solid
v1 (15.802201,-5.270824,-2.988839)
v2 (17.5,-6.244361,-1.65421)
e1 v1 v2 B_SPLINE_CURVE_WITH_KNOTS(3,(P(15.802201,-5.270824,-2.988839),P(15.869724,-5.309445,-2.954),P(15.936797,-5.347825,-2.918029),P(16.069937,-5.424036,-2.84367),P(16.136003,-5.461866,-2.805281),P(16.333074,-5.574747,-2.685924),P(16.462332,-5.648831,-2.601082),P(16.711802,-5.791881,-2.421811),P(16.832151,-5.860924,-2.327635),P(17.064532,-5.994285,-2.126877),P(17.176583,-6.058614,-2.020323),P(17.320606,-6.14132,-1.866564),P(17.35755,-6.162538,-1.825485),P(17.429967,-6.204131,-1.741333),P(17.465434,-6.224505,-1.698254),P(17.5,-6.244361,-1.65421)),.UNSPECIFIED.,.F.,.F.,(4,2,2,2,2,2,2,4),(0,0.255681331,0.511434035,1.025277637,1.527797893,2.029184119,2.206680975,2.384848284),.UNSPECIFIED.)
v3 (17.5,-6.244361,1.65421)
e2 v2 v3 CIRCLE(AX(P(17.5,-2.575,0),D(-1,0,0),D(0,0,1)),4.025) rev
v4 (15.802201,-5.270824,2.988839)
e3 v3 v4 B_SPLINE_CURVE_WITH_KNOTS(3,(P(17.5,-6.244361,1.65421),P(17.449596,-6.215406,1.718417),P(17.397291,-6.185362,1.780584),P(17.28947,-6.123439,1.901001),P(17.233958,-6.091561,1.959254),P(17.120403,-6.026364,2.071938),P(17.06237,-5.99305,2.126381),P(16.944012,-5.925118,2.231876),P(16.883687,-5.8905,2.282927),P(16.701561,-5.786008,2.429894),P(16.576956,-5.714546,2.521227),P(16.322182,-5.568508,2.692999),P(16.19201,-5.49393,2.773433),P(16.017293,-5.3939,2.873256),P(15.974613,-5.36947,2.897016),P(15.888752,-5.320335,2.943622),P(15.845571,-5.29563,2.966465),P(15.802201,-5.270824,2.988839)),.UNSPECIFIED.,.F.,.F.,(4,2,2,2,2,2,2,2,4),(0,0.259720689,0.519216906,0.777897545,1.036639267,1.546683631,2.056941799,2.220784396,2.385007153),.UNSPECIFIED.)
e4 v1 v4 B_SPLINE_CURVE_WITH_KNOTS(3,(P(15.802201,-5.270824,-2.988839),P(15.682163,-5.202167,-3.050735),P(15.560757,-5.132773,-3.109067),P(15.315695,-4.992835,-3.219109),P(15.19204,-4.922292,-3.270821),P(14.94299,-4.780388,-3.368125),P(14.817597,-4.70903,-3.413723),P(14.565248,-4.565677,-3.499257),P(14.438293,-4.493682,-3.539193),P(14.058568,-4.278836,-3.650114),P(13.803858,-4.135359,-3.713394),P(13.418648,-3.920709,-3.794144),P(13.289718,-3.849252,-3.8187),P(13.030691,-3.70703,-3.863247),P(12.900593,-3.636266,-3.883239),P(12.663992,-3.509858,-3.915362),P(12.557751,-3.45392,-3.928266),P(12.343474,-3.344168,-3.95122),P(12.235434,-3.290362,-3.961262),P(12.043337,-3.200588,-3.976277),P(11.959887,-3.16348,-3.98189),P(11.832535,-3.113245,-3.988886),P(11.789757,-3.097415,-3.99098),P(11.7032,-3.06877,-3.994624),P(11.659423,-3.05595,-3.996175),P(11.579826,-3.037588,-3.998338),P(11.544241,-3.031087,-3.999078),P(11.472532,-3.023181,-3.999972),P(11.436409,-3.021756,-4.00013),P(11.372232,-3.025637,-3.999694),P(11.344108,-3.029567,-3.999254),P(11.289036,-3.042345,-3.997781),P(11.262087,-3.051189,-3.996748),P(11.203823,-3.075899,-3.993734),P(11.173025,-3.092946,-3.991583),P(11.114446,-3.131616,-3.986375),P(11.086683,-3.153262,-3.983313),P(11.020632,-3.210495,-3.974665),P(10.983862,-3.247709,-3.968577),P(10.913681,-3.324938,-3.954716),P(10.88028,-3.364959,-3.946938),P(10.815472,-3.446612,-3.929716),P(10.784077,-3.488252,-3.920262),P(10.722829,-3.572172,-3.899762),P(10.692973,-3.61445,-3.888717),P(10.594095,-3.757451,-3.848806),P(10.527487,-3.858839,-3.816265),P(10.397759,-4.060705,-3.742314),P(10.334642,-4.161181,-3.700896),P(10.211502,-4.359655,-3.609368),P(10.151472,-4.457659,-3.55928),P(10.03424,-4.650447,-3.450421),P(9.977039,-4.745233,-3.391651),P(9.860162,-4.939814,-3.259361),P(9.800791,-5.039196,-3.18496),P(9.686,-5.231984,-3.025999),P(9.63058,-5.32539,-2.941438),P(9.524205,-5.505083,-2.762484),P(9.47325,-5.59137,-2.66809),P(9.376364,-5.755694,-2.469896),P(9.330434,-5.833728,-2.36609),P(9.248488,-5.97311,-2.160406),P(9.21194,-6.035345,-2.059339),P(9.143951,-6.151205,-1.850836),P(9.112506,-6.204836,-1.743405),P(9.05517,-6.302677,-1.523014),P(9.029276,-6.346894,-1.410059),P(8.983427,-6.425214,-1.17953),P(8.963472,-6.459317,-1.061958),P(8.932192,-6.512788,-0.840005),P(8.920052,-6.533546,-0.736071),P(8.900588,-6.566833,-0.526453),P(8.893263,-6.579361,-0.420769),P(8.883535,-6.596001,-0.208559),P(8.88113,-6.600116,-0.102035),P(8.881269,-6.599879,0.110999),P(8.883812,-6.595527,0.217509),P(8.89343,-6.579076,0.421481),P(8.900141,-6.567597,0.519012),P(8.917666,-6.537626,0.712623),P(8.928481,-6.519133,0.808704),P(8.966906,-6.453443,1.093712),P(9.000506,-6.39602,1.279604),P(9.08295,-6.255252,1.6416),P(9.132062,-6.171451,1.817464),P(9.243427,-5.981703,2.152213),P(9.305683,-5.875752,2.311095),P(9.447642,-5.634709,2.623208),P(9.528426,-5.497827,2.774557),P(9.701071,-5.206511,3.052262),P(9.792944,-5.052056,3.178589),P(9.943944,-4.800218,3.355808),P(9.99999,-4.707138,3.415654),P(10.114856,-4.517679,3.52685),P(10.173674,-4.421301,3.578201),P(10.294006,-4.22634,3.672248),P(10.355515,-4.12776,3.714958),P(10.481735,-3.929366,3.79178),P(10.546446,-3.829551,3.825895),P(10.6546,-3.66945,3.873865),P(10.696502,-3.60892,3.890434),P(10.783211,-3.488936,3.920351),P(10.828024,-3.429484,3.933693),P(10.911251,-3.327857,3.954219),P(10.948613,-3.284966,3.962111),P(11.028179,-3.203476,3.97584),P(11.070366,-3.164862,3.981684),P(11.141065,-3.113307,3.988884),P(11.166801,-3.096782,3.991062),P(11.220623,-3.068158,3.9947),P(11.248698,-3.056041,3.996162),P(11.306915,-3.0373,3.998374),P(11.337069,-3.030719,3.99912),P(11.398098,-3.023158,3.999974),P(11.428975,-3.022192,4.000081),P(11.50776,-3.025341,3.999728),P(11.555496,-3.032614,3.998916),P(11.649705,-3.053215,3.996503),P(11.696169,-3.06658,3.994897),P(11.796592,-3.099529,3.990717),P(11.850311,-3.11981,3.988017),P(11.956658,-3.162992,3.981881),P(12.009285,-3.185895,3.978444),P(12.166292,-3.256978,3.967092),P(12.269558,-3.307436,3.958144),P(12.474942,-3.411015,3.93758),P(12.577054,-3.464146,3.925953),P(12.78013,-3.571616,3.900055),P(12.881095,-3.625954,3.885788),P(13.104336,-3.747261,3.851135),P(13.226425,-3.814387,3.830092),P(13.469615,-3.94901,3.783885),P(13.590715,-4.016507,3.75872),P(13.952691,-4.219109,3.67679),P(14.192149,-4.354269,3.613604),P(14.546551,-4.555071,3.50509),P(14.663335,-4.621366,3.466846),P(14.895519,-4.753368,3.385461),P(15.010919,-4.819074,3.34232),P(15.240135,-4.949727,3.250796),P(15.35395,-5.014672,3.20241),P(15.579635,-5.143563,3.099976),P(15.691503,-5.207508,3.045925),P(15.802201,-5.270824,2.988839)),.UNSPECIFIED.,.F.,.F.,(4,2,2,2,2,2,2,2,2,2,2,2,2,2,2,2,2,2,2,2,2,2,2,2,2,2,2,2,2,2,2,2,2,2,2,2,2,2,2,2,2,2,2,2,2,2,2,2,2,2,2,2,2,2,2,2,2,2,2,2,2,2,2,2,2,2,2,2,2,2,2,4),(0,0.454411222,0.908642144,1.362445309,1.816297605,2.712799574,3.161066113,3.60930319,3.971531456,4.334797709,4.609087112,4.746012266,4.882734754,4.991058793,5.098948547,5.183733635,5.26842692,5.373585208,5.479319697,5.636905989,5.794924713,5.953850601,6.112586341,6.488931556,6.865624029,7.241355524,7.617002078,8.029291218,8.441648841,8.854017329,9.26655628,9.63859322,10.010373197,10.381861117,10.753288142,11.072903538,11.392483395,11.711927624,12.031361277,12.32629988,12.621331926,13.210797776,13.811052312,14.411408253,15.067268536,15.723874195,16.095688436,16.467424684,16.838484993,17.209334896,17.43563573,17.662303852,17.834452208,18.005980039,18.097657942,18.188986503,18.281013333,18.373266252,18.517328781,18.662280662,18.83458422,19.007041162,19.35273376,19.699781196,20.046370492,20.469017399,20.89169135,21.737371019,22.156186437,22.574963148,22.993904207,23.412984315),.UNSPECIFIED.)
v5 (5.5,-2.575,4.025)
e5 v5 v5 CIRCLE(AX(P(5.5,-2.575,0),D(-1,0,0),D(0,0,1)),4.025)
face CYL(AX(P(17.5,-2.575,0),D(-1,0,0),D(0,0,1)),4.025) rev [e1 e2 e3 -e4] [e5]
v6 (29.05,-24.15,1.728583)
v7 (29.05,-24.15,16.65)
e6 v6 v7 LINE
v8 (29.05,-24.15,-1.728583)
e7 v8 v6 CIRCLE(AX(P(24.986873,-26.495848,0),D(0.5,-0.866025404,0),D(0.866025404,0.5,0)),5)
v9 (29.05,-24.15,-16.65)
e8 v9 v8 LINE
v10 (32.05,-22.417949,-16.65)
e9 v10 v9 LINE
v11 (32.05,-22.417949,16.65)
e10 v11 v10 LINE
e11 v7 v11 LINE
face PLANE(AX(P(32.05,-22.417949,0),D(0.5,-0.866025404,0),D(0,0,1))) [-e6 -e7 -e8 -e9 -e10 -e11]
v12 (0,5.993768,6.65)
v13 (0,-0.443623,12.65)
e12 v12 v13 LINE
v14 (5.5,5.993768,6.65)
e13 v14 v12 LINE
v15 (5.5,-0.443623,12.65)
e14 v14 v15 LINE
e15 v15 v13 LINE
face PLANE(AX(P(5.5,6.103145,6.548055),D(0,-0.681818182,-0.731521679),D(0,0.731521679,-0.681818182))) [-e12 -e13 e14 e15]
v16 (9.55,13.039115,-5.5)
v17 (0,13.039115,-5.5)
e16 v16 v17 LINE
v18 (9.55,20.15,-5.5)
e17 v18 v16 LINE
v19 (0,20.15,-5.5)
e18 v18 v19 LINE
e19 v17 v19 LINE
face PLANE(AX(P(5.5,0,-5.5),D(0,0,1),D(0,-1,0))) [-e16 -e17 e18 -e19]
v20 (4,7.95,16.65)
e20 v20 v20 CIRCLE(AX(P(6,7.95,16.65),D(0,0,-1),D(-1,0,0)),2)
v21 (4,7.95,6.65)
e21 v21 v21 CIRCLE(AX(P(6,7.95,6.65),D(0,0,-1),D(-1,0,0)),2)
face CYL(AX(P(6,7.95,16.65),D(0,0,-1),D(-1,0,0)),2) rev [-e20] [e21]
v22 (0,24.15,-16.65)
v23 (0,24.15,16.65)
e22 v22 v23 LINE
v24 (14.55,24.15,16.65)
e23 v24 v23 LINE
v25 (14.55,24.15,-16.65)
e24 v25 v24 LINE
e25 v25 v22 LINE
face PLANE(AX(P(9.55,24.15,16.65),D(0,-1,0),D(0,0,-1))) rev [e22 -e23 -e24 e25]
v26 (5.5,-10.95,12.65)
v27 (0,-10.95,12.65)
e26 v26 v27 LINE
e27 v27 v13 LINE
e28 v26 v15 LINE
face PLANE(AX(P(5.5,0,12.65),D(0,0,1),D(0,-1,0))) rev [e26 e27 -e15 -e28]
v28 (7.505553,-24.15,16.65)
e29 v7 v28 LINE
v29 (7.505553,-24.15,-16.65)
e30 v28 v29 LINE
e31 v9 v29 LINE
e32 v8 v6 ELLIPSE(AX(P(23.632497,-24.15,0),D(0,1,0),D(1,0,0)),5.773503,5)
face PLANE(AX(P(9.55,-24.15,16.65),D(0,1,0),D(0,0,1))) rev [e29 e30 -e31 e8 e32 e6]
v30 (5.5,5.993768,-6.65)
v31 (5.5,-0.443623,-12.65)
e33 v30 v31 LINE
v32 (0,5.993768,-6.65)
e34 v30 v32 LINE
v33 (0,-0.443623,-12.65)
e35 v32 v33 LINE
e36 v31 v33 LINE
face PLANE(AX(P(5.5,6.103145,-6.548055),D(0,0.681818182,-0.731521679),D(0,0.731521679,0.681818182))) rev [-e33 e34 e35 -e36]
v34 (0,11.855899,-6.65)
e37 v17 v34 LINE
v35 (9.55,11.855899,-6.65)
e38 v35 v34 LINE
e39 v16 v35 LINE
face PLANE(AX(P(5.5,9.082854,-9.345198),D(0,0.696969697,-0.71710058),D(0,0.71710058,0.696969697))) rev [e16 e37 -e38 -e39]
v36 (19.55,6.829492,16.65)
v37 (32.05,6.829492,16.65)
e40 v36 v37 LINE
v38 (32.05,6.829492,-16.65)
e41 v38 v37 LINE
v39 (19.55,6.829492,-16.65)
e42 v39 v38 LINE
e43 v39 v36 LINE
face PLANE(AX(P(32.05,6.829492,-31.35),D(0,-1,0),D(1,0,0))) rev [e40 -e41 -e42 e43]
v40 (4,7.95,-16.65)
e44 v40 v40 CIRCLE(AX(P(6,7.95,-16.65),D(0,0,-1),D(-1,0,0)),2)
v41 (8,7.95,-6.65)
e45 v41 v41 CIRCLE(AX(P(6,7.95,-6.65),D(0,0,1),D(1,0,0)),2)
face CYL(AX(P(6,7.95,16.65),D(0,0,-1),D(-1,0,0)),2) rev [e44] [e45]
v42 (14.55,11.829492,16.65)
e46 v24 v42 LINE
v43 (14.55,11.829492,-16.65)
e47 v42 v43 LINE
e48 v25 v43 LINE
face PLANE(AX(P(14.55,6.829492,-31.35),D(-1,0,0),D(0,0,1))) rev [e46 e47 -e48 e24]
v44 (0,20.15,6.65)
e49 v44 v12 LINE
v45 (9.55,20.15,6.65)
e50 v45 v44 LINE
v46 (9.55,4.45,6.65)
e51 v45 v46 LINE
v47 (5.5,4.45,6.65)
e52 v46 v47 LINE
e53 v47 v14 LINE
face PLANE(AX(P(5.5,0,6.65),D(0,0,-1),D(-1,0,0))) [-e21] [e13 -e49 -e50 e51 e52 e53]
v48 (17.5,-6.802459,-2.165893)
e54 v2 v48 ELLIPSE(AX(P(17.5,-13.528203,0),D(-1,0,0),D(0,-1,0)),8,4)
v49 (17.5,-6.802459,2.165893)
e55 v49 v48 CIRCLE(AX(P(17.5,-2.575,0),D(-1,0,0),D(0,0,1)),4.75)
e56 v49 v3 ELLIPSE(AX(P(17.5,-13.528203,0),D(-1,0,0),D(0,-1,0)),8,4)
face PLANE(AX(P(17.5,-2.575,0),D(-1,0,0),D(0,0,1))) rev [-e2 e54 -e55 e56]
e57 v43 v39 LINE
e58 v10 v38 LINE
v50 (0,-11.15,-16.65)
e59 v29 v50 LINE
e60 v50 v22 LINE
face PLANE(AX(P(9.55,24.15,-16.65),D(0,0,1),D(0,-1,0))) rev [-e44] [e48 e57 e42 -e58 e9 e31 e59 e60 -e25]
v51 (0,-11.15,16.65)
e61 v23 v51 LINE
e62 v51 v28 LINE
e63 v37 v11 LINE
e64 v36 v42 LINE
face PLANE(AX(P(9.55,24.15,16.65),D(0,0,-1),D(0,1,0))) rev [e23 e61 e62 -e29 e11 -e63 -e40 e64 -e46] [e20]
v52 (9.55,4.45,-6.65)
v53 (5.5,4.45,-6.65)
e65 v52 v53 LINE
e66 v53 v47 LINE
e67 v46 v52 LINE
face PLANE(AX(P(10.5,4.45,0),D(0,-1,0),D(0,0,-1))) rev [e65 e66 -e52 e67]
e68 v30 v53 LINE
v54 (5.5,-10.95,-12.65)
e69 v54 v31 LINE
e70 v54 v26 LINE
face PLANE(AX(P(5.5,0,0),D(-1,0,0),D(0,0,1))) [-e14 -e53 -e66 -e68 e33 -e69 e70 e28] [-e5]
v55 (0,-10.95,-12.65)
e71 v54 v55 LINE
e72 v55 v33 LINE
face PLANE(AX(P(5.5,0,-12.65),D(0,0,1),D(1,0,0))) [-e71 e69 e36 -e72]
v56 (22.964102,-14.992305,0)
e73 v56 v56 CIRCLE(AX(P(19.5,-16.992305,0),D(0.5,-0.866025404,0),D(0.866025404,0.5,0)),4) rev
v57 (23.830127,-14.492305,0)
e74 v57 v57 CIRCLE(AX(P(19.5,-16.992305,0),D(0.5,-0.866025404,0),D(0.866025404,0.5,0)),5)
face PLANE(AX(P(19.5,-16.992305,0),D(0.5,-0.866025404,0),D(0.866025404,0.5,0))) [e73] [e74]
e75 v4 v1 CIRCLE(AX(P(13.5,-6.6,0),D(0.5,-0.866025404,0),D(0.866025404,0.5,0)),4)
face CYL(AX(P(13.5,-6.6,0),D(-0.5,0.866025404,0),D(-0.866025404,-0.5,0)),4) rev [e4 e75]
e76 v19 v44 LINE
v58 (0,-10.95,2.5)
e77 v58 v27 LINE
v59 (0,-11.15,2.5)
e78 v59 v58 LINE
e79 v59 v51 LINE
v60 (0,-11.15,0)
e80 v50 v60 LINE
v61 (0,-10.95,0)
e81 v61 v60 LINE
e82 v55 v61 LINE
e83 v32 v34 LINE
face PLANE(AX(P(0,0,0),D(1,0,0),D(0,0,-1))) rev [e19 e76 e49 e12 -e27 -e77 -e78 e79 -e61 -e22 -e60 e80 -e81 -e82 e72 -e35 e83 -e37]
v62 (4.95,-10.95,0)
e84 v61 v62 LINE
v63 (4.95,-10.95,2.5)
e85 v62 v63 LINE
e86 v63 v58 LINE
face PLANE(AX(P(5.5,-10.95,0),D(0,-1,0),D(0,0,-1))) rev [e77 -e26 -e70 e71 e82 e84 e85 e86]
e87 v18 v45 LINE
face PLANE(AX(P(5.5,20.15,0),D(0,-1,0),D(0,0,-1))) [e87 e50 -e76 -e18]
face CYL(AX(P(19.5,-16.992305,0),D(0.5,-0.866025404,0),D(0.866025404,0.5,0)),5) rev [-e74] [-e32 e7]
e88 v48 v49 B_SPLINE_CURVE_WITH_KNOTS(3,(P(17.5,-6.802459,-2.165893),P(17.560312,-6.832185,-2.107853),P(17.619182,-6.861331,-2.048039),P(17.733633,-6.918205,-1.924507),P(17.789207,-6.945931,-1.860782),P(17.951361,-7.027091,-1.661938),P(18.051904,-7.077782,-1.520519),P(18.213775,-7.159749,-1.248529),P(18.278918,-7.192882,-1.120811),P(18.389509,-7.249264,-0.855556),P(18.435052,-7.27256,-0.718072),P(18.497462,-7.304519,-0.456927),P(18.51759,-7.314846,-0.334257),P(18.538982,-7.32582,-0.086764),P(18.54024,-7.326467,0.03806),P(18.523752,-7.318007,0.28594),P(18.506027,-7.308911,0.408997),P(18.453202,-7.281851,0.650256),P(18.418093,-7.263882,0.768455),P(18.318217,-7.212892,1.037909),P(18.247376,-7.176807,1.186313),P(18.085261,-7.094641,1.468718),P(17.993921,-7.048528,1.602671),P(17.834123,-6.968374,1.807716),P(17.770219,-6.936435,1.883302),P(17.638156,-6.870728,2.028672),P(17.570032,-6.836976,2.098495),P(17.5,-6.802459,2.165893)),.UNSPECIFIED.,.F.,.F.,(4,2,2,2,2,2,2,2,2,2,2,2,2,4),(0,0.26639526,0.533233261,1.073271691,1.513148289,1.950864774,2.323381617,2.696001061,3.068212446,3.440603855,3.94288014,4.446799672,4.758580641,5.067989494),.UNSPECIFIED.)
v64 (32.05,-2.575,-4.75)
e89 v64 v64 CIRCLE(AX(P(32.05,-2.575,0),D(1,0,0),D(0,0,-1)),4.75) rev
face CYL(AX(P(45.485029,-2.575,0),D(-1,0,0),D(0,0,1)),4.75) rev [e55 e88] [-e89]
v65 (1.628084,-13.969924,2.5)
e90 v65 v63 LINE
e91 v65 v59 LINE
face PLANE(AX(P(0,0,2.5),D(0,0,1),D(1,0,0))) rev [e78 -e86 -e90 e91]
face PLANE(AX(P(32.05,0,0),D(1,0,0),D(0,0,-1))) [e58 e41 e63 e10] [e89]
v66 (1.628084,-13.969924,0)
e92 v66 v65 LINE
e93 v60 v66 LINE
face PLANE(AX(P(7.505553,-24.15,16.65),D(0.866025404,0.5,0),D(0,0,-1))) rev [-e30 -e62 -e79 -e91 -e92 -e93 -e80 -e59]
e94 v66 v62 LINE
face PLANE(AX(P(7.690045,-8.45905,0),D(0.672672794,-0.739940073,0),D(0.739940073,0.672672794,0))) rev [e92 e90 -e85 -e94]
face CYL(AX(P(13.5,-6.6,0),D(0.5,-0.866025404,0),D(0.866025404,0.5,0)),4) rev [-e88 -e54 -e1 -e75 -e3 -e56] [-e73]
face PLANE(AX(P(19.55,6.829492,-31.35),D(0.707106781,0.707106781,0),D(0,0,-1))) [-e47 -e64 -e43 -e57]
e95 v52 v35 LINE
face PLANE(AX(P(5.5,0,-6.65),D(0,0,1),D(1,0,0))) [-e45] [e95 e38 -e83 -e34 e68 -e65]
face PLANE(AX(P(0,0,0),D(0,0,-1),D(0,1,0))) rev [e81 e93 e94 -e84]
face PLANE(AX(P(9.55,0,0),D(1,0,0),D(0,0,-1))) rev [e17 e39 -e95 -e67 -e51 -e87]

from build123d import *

# Parameters (mm, degrees)
SKETCH1_W               = 33.3
SKETCH1_H               = 48.3
BOSS_EXTRUDE1_DEPTH     = 9.55
CUT_EXTRUDE1_DEPTH      = 5.5
SKETCH3_W               = 5.65
SKETCH3_H               = 13.7
CUT_EXTRUDE2_DEPTH      = 5
SKETCH5_W               = 33.3
SKETCH5_H               = 48.3
BOSS_EXTRUDE3_DEPTH     = 22.5
SKETCH6_R               = 4.025
CUT_EXTRUDE3_DEPTH      = 12
SKETCH7_R               = 4.75
CUT_EXTRUDE4_DEPTH      = 14.55
CUT_EXTRUDE6_DEPTH      = 46.909857329
CUT_EXTRUDE6_DEPTH_BACK = 46.909857329
SKETCH27_R              = 2
SKETCH30_R              = 4
SKETCH31_R              = 5
CHAMFER1_SIZE           = 13
CHAMFER1_SIZE2          = 7.505553499
CHAMFER2_SIZE           = 10
CHAMFER2_SIZE2          = 17.320508076
CHAMFER3_SIZE           = 1.732050808
CHAMFER3_SIZE_2         = 3
CROQUIS2_W              = 17.5
CROQUIS2_H              = 17.320508076
CORTAR_EXTRUIR1_DEPTH   = 48
CHAMFER4_SIZE           = 5


with BuildPart() as part:
    # Sketch1 → Boss-Extrude1 (new body)
    with BuildSketch(Plane(origin=(0, 0, 0), x_dir=(0, 0, -1), z_dir=(1, 0, 0))):
        Rectangle(SKETCH1_W, SKETCH1_H)
    extrude(amount=BOSS_EXTRUDE1_DEPTH)

    # Sketch2 → Cut-Extrude1 (cut)
    # profile 1 of 2: a face of its own
    with BuildSketch(Plane.ZY):
        Polygon((-5.5, 13.039115125), (-5.5, 20.15), (4.5, 20.15), (6.65, 20.15), (6.65, 5.993768204), (12.65, -0.443622572), (12.65, -9.1), (12.65, -10.95), (-12.65, -10.95), (-12.65, -9.1), (-12.65, -0.443622572), (-6.65, 5.993768204), (-6.65, 11.855899168), align=None)
        Polygon((4.5, 19.15), (5.65, 19.15), (5.65, 5.6), (11.65, -0.837390776), (11.65, -9.1), (11.65, -9.95), (-11.65, -9.95), (-11.65, -9.1), (-11.65, -0.837390776), (-5.65, 5.6), (-5.65, 11.45), (-4.5, 12.633215957), (-4.5, 19.15), align=None, mode=Mode.SUBTRACT)
    # profile 2 of 2: a face of its own
    with BuildSketch(Plane.ZY):
        Polygon((5.65, 19.15), (5.65, 5.6), (11.65, -0.837390776), (11.65, -9.1), (11.65, -9.95), (-11.65, -9.95), (-11.65, -9.1), (-11.65, -0.837390776), (-5.65, 5.6), (-5.65, 11.45), (-4.5, 12.633215957), (-4.5, 19.15), (4.5, 19.15), align=None)
    extrude(amount=-CUT_EXTRUDE1_DEPTH, mode=Mode.SUBTRACT)

    # Sketch3 → Cut-Extrude2 (cut)
    # profile 1 of 3: a face of its own
    with BuildSketch(Plane.ZY.offset(-5.5)):
        Polygon((-6.65, 4.45), (6.65, 4.45), (6.65, 20.15), (-5.5, 20.15), (-5.5, 13.039115125), (-6.65, 11.855899168), align=None)
        Polygon((5.65, 5.45), (5.65, 19.15), (-4.5, 19.15), (-4.5, 12.633215957), (-5.65, 11.45), (-5.65, 5.45), align=None, mode=Mode.SUBTRACT)
    # profile 2 of 3: a face of its own
    with BuildSketch(Plane.ZY.offset(-5.5)):
        Polygon((0, 5.45), (0, 19.15), (-4.5, 19.15), (-4.5, 12.633215957), (-5.65, 11.45), (-5.65, 5.45), align=None)
    # profile 3 of 3: a face of its own
    with BuildSketch(Plane.ZY.offset(-5.5)):
        with Locations((2.825, 12.3)):
            Rectangle(SKETCH3_W, SKETCH3_H)
    extrude(amount=-CUT_EXTRUDE2_DEPTH, mode=Mode.SUBTRACT)

    # Sketch5 → Boss-Extrude3 (add)
    with BuildSketch(Plane(origin=(9.55, 0, 0), x_dir=(0, 0, -1), z_dir=(1, 0, 0))):
        Rectangle(SKETCH5_W, SKETCH5_H)
    extrude(amount=BOSS_EXTRUDE3_DEPTH)

    # Sketch6 → Cut-Extrude3 (cut)
    with BuildSketch(Plane.ZY.offset(-5.5)):
        with Locations((0, -2.575)):
            Circle(SKETCH6_R)
    extrude(amount=-CUT_EXTRUDE3_DEPTH, mode=Mode.SUBTRACT)

    # Sketch7 → Cut-Extrude4 (cut)
    with BuildSketch(Plane.ZY.offset(-17.5)):
        with Locations((0, -2.575)):
            Circle(SKETCH7_R)
    extrude(amount=-CUT_EXTRUDE4_DEPTH, mode=Mode.SUBTRACT)

    # Sketch27 → Cut-Extrude6 (cut, two sides: drawn at the far end of the back side and taken through both)
    with BuildSketch(Plane(origin=(0, 0, 5.65), x_dir=(-1, 0, 0), z_dir=(0, 0, -1)).offset(-CUT_EXTRUDE6_DEPTH_BACK)):
        with Locations((-6, 7.95)):
            Circle(SKETCH27_R)
    extrude(amount=CUT_EXTRUDE6_DEPTH + CUT_EXTRUDE6_DEPTH_BACK, mode=Mode.SUBTRACT)

    # Cut-Sweep1: sweep along a path in Sketch28
    with BuildLine(Plane.XY) as cut_sweep1_path:
        Line((25.736872918, -27.79488562), (13.5, -6.6))
        Line((13.5, -6.6), (11.25, -2.702885683))
    # Sketch30 → Cut-Sweep1 (sweep, cut)
    with BuildSketch(Plane(origin=(18.469756751, -31.990557096, 0), x_dir=(0, 0, -1), z_dir=(0.500000000000001, -0.866025403784438, 0))):
        with Locations((0, 8.391342951)):
            Circle(SKETCH30_R)
    sweep(path=cut_sweep1_path.line, mode=Mode.SUBTRACT)

    # Cut-Sweep2: sweep along a path in Sketch29
    with BuildLine(Plane.XY) as cut_sweep2_path:
        Line((19.5, -16.992304845), (25.736872918, -27.79488562))
    # Sketch31 → Cut-Sweep2 (sweep, cut)
    with BuildSketch(Plane(origin=(18.469756751, -31.990557096, 0), x_dir=(0, 0, -1), z_dir=(0.500000000000001, -0.866025403784438, 0))):
        with Locations((0, 8.391342951)):
            Circle(SKETCH31_R)
    sweep(path=cut_sweep2_path.line, mode=Mode.SUBTRACT)

    # Chamfer1
    chamfer1_edges = [part.edges().sort_by_distance(p)[0] for p in [
        (0, -24.15, 0),
    ]]
    chamfer1_side = [part.faces().sort_by_distance(p)[0] for p in [
        (0, 23.563333144, 0),
    ]]
    chamfer(chamfer1_edges, length=CHAMFER1_SIZE, length2=CHAMFER1_SIZE2, reference=chamfer1_side[0])

    # Chamfer2
    chamfer2_edges = [part.edges().sort_by_distance(p)[0] for p in [
        (32.05, 24.15, 0),
    ]]
    chamfer2_side = [part.faces().sort_by_distance(p)[0] for p in [
        (16.025, 24.15, 0),
    ]]
    chamfer(chamfer2_edges, length=CHAMFER2_SIZE, length2=CHAMFER2_SIZE2, reference=chamfer2_side[0])

    # Chamfer3
    # the kernel refuses this chamfer: 3, 1.732050808 mm, written as the material it takes off along each edge
    with BuildSketch(Plane(origin=(32.05, -24.15, -24.411257264), x_dir=(0.05789386240267215, 0.9983227437537925, 0), z_dir=(0, 0, 1))) as chamfer3_piece_1:
        Polygon((CHAMFER3_SIZE * 0.998322743505, CHAMFER3_SIZE * 0.0578938623883), (-CHAMFER3_SIZE_2 * 0.0578938624027, CHAMFER3_SIZE_2 * 0.998322743754), (0, 0), align=None)
    extrude(amount=48.822514528, mode=Mode.SUBTRACT)

    # Croquis2 → Cortar-Extruir1 (cut)
    with BuildSketch(Plane.XY.offset(16.65)):
        with Locations((23.3, 15.489745962)):
            Rectangle(CROQUIS2_W, CROQUIS2_H)
    extrude(amount=-CORTAR_EXTRUIR1_DEPTH, mode=Mode.SUBTRACT)

    # Chamfer4
    chamfer4_edges = [part.edges().sort_by_distance(p)[0] for p in [
        (14.55, 6.829491924, 0),
    ]]
    chamfer(chamfer4_edges, length=CHAMFER4_SIZE)

    # Sketch33 → Cut-Loft2 section 0
    with BuildSketch(Plane.ZY):
        with BuildLine():
            Line((0, -9.95), (0, -15.45))
            Line((0, -15.45), (2.5, -15.45))
            Line((2.5, -15.45), (2.5, -9.95))
            Line((2.5, -9.95), (0, -9.95))
        make_face()
    # Sketch34 → Cut-Loft2 section 1
    with BuildSketch(Plane.ZY.offset(-5.5)):
        with BuildLine():
            Line((0, -9.95), (2.5, -9.95))
            Line((2.5, -9.95), (2.5, -10.45))
            Line((2.5, -10.45), (0, -10.45))
            Line((0, -10.45), (0, -9.95))
        make_face()
    loft(mode=Mode.SUBTRACT)


solid = part.part
